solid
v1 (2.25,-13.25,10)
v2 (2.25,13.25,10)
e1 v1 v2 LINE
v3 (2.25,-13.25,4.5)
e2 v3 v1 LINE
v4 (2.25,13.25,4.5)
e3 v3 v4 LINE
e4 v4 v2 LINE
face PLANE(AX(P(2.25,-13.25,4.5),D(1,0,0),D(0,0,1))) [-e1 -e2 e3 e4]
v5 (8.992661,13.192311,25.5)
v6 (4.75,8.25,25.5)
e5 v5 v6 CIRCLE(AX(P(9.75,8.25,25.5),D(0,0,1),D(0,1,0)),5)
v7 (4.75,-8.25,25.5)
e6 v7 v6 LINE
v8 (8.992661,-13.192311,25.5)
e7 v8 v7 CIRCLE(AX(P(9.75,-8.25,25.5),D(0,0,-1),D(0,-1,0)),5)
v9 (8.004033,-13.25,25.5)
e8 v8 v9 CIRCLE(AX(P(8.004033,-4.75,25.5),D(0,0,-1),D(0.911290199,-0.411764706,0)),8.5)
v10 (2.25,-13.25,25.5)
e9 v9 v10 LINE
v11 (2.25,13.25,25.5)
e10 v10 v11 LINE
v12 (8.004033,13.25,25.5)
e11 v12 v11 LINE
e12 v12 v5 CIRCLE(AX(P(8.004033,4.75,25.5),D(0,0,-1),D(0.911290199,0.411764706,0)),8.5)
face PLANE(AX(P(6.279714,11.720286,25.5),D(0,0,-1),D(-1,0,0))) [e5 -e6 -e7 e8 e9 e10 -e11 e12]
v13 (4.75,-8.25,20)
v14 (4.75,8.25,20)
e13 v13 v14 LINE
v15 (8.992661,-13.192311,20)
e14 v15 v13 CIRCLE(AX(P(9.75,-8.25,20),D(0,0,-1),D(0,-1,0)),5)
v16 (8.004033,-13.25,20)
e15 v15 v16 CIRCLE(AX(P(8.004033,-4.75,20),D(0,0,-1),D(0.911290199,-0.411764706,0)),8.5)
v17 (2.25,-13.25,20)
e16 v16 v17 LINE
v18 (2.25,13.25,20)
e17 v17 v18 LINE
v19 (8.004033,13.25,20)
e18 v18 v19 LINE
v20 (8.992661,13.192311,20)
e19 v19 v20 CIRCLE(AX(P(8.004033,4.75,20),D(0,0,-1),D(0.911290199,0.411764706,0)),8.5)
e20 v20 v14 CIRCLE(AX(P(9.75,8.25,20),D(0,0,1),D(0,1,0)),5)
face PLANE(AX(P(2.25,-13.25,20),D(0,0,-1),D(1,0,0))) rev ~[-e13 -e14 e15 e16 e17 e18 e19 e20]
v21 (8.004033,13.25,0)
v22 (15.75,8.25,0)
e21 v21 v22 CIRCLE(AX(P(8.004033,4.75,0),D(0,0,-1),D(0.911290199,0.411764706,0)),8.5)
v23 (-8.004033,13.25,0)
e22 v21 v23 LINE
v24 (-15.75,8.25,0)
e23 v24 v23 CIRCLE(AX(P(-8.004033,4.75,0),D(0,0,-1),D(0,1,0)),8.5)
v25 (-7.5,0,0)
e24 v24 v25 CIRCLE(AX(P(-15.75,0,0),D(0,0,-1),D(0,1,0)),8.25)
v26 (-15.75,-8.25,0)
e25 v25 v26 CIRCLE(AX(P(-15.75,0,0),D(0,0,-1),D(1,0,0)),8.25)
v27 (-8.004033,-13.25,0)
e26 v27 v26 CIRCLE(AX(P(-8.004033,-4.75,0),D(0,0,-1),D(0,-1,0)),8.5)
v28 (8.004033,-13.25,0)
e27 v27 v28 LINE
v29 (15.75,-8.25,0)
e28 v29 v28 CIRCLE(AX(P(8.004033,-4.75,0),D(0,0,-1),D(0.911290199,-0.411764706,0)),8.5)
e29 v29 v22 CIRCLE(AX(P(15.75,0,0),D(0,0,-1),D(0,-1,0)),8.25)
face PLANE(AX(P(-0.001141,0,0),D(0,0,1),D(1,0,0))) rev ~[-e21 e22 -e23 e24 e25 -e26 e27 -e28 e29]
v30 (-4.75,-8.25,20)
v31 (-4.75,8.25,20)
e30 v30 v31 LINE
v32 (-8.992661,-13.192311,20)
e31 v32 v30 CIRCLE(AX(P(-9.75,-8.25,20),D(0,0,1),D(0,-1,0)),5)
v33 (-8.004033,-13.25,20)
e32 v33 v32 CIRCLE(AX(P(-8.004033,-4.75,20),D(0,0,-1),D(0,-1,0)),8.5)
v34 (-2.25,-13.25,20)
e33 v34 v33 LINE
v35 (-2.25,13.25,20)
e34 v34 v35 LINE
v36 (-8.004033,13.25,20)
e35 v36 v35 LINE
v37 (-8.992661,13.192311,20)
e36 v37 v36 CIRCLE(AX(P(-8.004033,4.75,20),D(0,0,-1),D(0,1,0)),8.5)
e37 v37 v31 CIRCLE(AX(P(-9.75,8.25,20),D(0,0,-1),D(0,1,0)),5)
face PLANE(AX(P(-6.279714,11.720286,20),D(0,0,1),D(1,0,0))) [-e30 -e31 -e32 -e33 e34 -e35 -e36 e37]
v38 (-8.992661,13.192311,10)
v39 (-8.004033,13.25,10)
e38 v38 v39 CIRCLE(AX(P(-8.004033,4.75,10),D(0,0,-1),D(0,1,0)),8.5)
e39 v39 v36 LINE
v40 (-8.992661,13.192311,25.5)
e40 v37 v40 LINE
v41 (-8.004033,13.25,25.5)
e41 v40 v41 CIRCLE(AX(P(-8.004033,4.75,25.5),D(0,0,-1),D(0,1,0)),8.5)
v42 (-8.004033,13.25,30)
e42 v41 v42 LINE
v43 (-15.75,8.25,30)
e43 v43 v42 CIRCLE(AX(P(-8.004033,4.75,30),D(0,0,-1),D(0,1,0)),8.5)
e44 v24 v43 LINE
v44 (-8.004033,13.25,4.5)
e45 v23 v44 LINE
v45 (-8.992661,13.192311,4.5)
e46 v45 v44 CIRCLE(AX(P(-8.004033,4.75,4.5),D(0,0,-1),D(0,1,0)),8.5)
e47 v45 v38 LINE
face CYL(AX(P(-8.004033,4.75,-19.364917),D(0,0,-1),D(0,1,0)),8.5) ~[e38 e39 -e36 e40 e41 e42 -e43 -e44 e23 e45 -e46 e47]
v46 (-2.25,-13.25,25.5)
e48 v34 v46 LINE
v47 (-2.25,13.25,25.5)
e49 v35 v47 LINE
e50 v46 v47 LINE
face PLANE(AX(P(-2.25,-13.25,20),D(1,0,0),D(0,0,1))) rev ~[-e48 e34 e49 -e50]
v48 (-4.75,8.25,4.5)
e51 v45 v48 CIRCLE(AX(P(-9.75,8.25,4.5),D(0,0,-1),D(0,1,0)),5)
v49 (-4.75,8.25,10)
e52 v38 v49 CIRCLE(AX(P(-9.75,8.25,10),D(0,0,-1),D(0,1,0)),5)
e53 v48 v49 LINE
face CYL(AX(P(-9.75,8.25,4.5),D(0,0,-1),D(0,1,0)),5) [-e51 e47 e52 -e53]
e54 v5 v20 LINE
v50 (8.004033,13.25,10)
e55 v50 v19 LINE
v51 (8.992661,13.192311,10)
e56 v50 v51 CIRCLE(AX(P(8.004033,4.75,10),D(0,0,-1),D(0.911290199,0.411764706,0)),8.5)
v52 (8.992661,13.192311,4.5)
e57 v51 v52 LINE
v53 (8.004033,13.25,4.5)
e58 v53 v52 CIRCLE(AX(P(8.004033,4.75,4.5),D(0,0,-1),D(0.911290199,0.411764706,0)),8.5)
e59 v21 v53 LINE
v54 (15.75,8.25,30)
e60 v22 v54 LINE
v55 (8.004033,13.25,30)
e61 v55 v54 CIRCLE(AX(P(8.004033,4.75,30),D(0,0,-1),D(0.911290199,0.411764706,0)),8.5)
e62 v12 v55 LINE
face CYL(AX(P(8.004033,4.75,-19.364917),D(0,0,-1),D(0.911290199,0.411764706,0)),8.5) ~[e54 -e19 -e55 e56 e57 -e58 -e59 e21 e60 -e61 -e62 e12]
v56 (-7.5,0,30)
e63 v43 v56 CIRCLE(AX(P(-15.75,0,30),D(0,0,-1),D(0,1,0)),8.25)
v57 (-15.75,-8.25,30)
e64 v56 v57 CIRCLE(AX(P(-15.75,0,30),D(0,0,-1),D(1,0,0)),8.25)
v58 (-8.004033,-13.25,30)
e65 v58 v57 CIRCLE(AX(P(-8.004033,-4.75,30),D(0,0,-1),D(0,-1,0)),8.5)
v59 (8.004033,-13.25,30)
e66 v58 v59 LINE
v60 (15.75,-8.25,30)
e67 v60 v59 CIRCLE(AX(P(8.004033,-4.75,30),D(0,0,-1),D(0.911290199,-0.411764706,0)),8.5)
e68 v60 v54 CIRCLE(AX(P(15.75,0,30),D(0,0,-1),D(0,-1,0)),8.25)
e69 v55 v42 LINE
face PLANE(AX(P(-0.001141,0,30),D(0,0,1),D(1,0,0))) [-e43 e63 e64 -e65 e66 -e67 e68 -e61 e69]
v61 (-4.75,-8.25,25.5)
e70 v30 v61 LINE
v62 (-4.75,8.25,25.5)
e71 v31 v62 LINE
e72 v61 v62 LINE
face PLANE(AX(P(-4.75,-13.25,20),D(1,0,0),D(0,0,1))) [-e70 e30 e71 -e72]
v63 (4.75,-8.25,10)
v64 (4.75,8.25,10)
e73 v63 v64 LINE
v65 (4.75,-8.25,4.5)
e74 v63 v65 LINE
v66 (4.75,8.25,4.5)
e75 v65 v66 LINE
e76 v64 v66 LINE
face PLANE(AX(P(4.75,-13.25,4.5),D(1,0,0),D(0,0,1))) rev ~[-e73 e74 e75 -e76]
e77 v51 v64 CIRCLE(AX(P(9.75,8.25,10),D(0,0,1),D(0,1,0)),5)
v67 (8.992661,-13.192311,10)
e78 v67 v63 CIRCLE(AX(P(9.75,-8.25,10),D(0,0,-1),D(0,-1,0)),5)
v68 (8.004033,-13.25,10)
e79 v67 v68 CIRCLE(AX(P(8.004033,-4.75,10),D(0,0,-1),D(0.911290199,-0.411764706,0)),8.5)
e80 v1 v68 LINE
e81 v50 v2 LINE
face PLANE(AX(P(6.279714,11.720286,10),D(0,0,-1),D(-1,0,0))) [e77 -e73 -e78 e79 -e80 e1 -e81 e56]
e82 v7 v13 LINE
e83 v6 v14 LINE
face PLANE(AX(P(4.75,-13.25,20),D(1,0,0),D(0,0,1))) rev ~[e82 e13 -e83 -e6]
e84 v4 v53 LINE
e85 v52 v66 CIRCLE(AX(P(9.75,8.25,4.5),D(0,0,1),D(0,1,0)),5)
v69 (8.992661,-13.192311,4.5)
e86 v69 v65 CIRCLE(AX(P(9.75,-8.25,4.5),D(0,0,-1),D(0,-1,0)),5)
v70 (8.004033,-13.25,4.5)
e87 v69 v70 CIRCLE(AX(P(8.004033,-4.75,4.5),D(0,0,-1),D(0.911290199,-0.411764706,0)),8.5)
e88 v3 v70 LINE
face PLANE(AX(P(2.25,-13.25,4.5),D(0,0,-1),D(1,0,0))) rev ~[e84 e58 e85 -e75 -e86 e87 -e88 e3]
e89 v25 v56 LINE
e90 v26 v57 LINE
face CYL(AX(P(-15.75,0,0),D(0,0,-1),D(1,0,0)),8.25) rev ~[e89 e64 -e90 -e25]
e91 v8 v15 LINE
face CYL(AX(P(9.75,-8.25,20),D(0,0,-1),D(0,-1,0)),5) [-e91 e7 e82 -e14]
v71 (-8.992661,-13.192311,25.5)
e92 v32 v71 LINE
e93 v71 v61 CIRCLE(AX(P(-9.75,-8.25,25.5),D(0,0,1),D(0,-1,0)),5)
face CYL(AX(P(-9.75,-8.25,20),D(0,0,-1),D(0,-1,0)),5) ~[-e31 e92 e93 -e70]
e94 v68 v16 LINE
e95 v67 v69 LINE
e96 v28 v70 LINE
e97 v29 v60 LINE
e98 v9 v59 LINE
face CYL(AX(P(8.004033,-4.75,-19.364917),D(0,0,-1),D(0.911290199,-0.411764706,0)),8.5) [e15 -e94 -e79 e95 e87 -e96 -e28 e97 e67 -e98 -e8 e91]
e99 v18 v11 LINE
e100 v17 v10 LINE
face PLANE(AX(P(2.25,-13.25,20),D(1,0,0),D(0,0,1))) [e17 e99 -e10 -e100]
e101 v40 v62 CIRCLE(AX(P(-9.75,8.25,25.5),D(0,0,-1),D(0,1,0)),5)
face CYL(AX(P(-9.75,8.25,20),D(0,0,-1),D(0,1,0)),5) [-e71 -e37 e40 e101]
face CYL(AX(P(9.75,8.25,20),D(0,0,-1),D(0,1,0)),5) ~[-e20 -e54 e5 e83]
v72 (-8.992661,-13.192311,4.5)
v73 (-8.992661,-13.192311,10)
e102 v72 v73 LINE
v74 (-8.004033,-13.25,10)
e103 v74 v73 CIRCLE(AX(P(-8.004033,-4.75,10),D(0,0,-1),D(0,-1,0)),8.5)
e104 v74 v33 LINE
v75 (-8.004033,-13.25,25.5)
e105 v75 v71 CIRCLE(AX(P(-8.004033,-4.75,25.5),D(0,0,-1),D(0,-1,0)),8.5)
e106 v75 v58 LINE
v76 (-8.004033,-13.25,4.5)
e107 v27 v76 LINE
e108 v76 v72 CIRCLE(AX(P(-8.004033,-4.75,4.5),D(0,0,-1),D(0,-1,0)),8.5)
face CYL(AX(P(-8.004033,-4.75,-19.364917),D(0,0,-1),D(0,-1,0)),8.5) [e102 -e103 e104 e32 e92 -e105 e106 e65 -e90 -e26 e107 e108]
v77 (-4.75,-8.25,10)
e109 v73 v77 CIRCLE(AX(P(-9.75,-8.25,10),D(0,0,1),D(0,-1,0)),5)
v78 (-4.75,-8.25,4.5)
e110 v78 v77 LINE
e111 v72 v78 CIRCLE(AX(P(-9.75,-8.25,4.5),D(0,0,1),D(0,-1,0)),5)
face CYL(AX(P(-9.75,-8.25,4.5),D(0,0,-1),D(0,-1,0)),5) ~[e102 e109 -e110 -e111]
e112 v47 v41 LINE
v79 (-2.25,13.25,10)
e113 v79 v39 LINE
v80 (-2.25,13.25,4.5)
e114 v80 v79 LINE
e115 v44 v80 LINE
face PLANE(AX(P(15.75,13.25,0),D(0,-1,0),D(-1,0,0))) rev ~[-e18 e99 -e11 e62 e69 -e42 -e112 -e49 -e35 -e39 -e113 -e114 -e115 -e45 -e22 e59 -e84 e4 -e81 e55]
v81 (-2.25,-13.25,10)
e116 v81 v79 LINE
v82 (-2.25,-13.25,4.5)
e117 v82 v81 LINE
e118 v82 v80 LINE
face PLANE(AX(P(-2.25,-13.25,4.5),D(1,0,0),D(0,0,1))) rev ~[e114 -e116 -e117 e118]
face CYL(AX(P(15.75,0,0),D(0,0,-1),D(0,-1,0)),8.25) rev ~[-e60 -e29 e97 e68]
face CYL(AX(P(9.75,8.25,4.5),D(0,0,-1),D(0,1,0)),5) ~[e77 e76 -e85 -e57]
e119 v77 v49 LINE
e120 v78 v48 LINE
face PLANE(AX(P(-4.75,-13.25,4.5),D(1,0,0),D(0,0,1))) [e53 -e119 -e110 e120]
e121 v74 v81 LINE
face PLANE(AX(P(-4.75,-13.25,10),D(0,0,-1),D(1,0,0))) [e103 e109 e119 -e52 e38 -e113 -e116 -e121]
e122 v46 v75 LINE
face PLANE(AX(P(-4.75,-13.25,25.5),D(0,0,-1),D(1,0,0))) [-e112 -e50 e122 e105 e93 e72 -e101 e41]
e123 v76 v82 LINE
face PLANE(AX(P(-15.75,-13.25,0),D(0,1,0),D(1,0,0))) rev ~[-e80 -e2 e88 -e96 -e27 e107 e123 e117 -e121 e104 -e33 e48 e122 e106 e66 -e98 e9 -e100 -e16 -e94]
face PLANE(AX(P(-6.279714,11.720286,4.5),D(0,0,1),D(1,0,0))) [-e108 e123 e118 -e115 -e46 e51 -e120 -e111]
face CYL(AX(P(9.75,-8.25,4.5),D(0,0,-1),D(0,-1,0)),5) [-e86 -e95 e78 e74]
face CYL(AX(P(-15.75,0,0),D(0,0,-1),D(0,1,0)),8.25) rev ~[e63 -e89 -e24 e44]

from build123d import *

# Parameters (mm, degrees)
F1_DEPTH     = 30
F2_W         = 2.5
F2_H         = 5.5
F3_DEPTH     = 27
F4_T1_DEPTH  = 68.7298334621
F5_T1_DEPTH  = 5.5
F5_T3_DEPTH  = 5.5
F5_T8_DEPTH  = 30.5
F5_T13_DEPTH = 30.5
F5_T18_DEPTH = 30.5
F5_T23_DEPTH = 30.5
F5_T28_DEPTH = 30.5
F5_T33_DEPTH = 30.5
F5_T38_DEPTH = 30.5
F5_T43_DEPTH = 30.5


# Not quite as in the source:
# - a fillet or chamfer that OpenCascade refuses, or shapes differently, is made with other operations: its cross-section is extruded or revolved along the edge and cut away or added


with BuildPart() as f1:
    # F0 (on Top) → F1 (new body)
    with BuildSketch(Plane.XY):
        with BuildLine():
            Line((15.75, 13.25), (-15.75, 13.25))
            Line((-15.75, 13.25), (-15.75, 8.25))
            ThreePointArc((-15.75, 8.25), (-9.9163690552, 5.8336309448), (-7.5, 0))
            ThreePointArc((-7.5, 0), (-9.9163690552, -5.8336309448), (-15.75, -8.25))
            Line((-15.75, -8.25), (-15.75, -13.25))
            Line((-15.75, -13.25), (15.75, -13.25))
            Line((15.75, -13.25), (15.75, -8.25))
            ThreePointArc((15.75, -8.25), (7.5, 0), (15.75, 8.25))
            Line((15.75, 8.25), (15.75, 13.25))
        make_face()
    extrude(amount=F1_DEPTH)

    # F2 (on face) → F3 (cut)
    with BuildSketch(Plane.XZ.offset(13.25)):
        with Locations((-3.5, 22.75)):
            Rectangle(F2_W, F2_H)
        with Locations((-3.5, 7.25)):
            Rectangle(F2_W, F2_H)
        with Locations((3.5, 22.75)):
            Rectangle(F2_W, F2_H)
        with Locations((3.5, 7.25)):
            Rectangle(F2_W, F2_H)
    extrude(amount=-F3_DEPTH, mode=Mode.SUBTRACT)

    # F4: fillet of radius 8.5 on 4 edges, made by hand

    # F4_s2 → F4_t1 (cut)
    with BuildSketch(Plane.XY.offset(-19.364916731)):
        with BuildLine():
            ThreePointArc((-8.0040333076, 13.25), (-12.6138055362, 11.8914284285), (-15.75, 8.25))
            Line((-15.75, 8.25), (-15.75, 13.25))
            Line((-15.75, 13.25), (-8.0040333076, 13.25))
        make_face()
        with BuildLine():
            ThreePointArc((-8.0040333076, -13.25), (-12.6138055362, -11.8914284285), (-15.75, -8.25))
            Line((-15.75, -8.25), (-15.75, -13.25))
            Line((-15.75, -13.25), (-8.0040333076, -13.25))
        make_face()
        with BuildLine():
            ThreePointArc((15.75, -8.25), (12.6138055362, -11.8914284285), (8.0040333076, -13.25))
            Line((8.0040333076, -13.25), (15.75, -13.25))
            Line((15.75, -13.25), (15.75, -8.25))
        make_face()
        with BuildLine():
            ThreePointArc((15.75, 8.25), (12.6138055362, 11.8914284285), (8.0040333076, 13.25))
            Line((8.0040333076, 13.25), (15.75, 13.25))
            Line((15.75, 13.25), (15.75, 8.25))
        make_face()
    extrude(amount=F4_T1_DEPTH, mode=Mode.SUBTRACT)

    # F5: fillet of radius 5 on 8 edges, made by hand

    # F5_s2 → F5_t1 (cut)
    with BuildSketch(Plane.XY.offset(20)):
        with BuildLine():
            ThreePointArc((-9.75, -13.25), (-6.2144660941, -11.7855339059), (-4.75, -8.25))
            Line((-4.75, -8.25), (-4.75, -13.25))
            Line((-4.75, -13.25), (-9.75, -13.25))
        make_face()
        with BuildLine():
            ThreePointArc((9.75, -13.25), (6.2144660941, -11.7855339059), (4.75, -8.25))
            Line((4.75, -8.25), (4.75, -13.25))
            Line((4.75, -13.25), (9.75, -13.25))
        make_face()
        with BuildLine():
            ThreePointArc((9.75, 13.25), (6.2144660941, 11.7855339059), (4.75, 8.25))
            Line((4.75, 8.25), (4.75, 13.25))
            Line((4.75, 13.25), (9.75, 13.25))
        make_face()
        with BuildLine():
            ThreePointArc((-9.75, 13.25), (-6.2144660941, 11.7855339059), (-4.75, 8.25))
            Line((-4.75, 8.25), (-4.75, 13.25))
            Line((-4.75, 13.25), (-9.75, 13.25))
        make_face()
    extrude(amount=F5_T1_DEPTH, mode=Mode.SUBTRACT)

    # F5_s4 → F5_t3 (cut)
    with BuildSketch(Plane.XY.offset(4.5)):
        with BuildLine():
            ThreePointArc((-9.75, -13.25), (-6.2144660941, -11.7855339059), (-4.75, -8.25))
            Line((-4.75, -8.25), (-4.75, -13.25))
            Line((-4.75, -13.25), (-9.75, -13.25))
        make_face()
        with BuildLine():
            ThreePointArc((9.75, -13.25), (6.2144660941, -11.7855339059), (4.75, -8.25))
            Line((4.75, -8.25), (4.75, -13.25))
            Line((4.75, -13.25), (9.75, -13.25))
        make_face()
        with BuildLine():
            ThreePointArc((9.75, 13.25), (6.2144660941, 11.7855339059), (4.75, 8.25))
            Line((4.75, 8.25), (4.75, 13.25))
            Line((4.75, 13.25), (9.75, 13.25))
        make_face()
        with BuildLine():
            ThreePointArc((-9.75, 13.25), (-6.2144660941, 11.7855339059), (-4.75, 8.25))
            Line((-4.75, 8.25), (-4.75, 13.25))
            Line((-4.75, 13.25), (-9.75, 13.25))
        make_face()
    extrude(amount=F5_T3_DEPTH, mode=Mode.SUBTRACT)


with BuildPart() as f5_tool6:
    # F5_s7 → F5_t8 (new body)
    with BuildSketch(Plane.XY.offset(38)):
        with BuildLine():
            ThreePointArc((-9.75, -13.25), (-6.2144660941, -11.7855339059), (-4.75, -8.25))
            Line((-4.75, -8.25), (-4.75, -13.25))
            Line((-4.75, -13.25), (-9.75, -13.25))
        make_face()
    extrude(amount=-F5_T8_DEPTH)

    split(bisect_by=Plane.XY.offset(10), keep=Keep.BOTTOM)


with BuildPart() as f1_1:
    add(f1.part)

    # F5_t5: cut F5_tool6
    add(f5_tool6.part, mode=Mode.SUBTRACT)


with BuildPart() as f5_tool11:
    # F5_s12 → F5_t13 (new body)
    with BuildSketch(Plane.XY.offset(22.5)):
        with BuildLine():
            ThreePointArc((-9.75, -13.25), (-6.2144660941, -11.7855339059), (-4.75, -8.25))
            Line((-4.75, -8.25), (-4.75, -13.25))
            Line((-4.75, -13.25), (-9.75, -13.25))
        make_face()
    extrude(amount=-F5_T13_DEPTH)

    split(bisect_by=Plane.XY.offset(20), keep=Keep.TOP)


with BuildPart() as f1_2:
    add(f1_1.part)

    # F5_t10: cut F5_tool11
    add(f5_tool11.part, mode=Mode.SUBTRACT)


with BuildPart() as f5_tool16:
    # F5_s17 → F5_t18 (new body)
    with BuildSketch(Plane.XY.offset(7.5)):
        with BuildLine():
            ThreePointArc((9.75, -13.25), (6.2144660941, -11.7855339059), (4.75, -8.25))
            Line((4.75, -8.25), (4.75, -13.25))
            Line((4.75, -13.25), (9.75, -13.25))
        make_face()
    extrude(amount=F5_T18_DEPTH)

    split(bisect_by=Plane.XY.offset(10), keep=Keep.BOTTOM)


with BuildPart() as f1_3:
    add(f1_2.part)

    # F5_t15: cut F5_tool16
    add(f5_tool16.part, mode=Mode.SUBTRACT)


with BuildPart() as f5_tool21:
    # F5_s22 → F5_t23 (new body)
    with BuildSketch(Plane.XY.offset(-8)):
        with BuildLine():
            ThreePointArc((9.75, -13.25), (6.2144660941, -11.7855339059), (4.75, -8.25))
            Line((4.75, -8.25), (4.75, -13.25))
            Line((4.75, -13.25), (9.75, -13.25))
        make_face()
    extrude(amount=F5_T23_DEPTH)

    split(bisect_by=Plane.XY.offset(20), keep=Keep.TOP)


with BuildPart() as f1_4:
    add(f1_3.part)

    # F5_t20: cut F5_tool21
    add(f5_tool21.part, mode=Mode.SUBTRACT)


with BuildPart() as f5_tool26:
    # F5_s27 → F5_t28 (new body)
    with BuildSketch(Plane.XY.offset(7.5)):
        with BuildLine():
            ThreePointArc((9.75, 13.25), (6.2144660941, 11.7855339059), (4.75, 8.25))
            Line((4.75, 8.25), (4.75, 13.25))
            Line((4.75, 13.25), (9.75, 13.25))
        make_face()
    extrude(amount=F5_T28_DEPTH)

    split(bisect_by=Plane.XY.offset(10), keep=Keep.BOTTOM)


with BuildPart() as f1_5:
    add(f1_4.part)

    # F5_t25: cut F5_tool26
    add(f5_tool26.part, mode=Mode.SUBTRACT)


with BuildPart() as f5_tool31:
    # F5_s32 → F5_t33 (new body)
    with BuildSketch(Plane.XY.offset(-8)):
        with BuildLine():
            ThreePointArc((9.75, 13.25), (6.2144660941, 11.7855339059), (4.75, 8.25))
            Line((4.75, 8.25), (4.75, 13.25))
            Line((4.75, 13.25), (9.75, 13.25))
        make_face()
    extrude(amount=F5_T33_DEPTH)

    split(bisect_by=Plane.XY.offset(20), keep=Keep.TOP)


with BuildPart() as f1_6:
    add(f1_5.part)

    # F5_t30: cut F5_tool31
    add(f5_tool31.part, mode=Mode.SUBTRACT)


with BuildPart() as f5_tool36:
    # F5_s37 → F5_t38 (new body)
    with BuildSketch(Plane.XY.offset(38)):
        with BuildLine():
            ThreePointArc((-9.75, 13.25), (-6.2144660941, 11.7855339059), (-4.75, 8.25))
            Line((-4.75, 8.25), (-4.75, 13.25))
            Line((-4.75, 13.25), (-9.75, 13.25))
        make_face()
    extrude(amount=-F5_T38_DEPTH)

    split(bisect_by=Plane.XY.offset(10), keep=Keep.BOTTOM)


with BuildPart() as f1_7:
    add(f1_6.part)

    # F5_t35: cut F5_tool36
    add(f5_tool36.part, mode=Mode.SUBTRACT)


with BuildPart() as f5_tool41:
    # F5_s42 → F5_t43 (new body)
    with BuildSketch(Plane.XY.offset(22.5)):
        with BuildLine():
            ThreePointArc((-9.75, 13.25), (-6.2144660941, 11.7855339059), (-4.75, 8.25))
            Line((-4.75, 8.25), (-4.75, 13.25))
            Line((-4.75, 13.25), (-9.75, 13.25))
        make_face()
    extrude(amount=-F5_T43_DEPTH)

    split(bisect_by=Plane.XY.offset(20), keep=Keep.TOP)


with BuildPart() as f1_8:
    add(f1_7.part)

    # F5_t40: cut F5_tool41
    add(f5_tool41.part, mode=Mode.SUBTRACT)


solid = f1_8.part
